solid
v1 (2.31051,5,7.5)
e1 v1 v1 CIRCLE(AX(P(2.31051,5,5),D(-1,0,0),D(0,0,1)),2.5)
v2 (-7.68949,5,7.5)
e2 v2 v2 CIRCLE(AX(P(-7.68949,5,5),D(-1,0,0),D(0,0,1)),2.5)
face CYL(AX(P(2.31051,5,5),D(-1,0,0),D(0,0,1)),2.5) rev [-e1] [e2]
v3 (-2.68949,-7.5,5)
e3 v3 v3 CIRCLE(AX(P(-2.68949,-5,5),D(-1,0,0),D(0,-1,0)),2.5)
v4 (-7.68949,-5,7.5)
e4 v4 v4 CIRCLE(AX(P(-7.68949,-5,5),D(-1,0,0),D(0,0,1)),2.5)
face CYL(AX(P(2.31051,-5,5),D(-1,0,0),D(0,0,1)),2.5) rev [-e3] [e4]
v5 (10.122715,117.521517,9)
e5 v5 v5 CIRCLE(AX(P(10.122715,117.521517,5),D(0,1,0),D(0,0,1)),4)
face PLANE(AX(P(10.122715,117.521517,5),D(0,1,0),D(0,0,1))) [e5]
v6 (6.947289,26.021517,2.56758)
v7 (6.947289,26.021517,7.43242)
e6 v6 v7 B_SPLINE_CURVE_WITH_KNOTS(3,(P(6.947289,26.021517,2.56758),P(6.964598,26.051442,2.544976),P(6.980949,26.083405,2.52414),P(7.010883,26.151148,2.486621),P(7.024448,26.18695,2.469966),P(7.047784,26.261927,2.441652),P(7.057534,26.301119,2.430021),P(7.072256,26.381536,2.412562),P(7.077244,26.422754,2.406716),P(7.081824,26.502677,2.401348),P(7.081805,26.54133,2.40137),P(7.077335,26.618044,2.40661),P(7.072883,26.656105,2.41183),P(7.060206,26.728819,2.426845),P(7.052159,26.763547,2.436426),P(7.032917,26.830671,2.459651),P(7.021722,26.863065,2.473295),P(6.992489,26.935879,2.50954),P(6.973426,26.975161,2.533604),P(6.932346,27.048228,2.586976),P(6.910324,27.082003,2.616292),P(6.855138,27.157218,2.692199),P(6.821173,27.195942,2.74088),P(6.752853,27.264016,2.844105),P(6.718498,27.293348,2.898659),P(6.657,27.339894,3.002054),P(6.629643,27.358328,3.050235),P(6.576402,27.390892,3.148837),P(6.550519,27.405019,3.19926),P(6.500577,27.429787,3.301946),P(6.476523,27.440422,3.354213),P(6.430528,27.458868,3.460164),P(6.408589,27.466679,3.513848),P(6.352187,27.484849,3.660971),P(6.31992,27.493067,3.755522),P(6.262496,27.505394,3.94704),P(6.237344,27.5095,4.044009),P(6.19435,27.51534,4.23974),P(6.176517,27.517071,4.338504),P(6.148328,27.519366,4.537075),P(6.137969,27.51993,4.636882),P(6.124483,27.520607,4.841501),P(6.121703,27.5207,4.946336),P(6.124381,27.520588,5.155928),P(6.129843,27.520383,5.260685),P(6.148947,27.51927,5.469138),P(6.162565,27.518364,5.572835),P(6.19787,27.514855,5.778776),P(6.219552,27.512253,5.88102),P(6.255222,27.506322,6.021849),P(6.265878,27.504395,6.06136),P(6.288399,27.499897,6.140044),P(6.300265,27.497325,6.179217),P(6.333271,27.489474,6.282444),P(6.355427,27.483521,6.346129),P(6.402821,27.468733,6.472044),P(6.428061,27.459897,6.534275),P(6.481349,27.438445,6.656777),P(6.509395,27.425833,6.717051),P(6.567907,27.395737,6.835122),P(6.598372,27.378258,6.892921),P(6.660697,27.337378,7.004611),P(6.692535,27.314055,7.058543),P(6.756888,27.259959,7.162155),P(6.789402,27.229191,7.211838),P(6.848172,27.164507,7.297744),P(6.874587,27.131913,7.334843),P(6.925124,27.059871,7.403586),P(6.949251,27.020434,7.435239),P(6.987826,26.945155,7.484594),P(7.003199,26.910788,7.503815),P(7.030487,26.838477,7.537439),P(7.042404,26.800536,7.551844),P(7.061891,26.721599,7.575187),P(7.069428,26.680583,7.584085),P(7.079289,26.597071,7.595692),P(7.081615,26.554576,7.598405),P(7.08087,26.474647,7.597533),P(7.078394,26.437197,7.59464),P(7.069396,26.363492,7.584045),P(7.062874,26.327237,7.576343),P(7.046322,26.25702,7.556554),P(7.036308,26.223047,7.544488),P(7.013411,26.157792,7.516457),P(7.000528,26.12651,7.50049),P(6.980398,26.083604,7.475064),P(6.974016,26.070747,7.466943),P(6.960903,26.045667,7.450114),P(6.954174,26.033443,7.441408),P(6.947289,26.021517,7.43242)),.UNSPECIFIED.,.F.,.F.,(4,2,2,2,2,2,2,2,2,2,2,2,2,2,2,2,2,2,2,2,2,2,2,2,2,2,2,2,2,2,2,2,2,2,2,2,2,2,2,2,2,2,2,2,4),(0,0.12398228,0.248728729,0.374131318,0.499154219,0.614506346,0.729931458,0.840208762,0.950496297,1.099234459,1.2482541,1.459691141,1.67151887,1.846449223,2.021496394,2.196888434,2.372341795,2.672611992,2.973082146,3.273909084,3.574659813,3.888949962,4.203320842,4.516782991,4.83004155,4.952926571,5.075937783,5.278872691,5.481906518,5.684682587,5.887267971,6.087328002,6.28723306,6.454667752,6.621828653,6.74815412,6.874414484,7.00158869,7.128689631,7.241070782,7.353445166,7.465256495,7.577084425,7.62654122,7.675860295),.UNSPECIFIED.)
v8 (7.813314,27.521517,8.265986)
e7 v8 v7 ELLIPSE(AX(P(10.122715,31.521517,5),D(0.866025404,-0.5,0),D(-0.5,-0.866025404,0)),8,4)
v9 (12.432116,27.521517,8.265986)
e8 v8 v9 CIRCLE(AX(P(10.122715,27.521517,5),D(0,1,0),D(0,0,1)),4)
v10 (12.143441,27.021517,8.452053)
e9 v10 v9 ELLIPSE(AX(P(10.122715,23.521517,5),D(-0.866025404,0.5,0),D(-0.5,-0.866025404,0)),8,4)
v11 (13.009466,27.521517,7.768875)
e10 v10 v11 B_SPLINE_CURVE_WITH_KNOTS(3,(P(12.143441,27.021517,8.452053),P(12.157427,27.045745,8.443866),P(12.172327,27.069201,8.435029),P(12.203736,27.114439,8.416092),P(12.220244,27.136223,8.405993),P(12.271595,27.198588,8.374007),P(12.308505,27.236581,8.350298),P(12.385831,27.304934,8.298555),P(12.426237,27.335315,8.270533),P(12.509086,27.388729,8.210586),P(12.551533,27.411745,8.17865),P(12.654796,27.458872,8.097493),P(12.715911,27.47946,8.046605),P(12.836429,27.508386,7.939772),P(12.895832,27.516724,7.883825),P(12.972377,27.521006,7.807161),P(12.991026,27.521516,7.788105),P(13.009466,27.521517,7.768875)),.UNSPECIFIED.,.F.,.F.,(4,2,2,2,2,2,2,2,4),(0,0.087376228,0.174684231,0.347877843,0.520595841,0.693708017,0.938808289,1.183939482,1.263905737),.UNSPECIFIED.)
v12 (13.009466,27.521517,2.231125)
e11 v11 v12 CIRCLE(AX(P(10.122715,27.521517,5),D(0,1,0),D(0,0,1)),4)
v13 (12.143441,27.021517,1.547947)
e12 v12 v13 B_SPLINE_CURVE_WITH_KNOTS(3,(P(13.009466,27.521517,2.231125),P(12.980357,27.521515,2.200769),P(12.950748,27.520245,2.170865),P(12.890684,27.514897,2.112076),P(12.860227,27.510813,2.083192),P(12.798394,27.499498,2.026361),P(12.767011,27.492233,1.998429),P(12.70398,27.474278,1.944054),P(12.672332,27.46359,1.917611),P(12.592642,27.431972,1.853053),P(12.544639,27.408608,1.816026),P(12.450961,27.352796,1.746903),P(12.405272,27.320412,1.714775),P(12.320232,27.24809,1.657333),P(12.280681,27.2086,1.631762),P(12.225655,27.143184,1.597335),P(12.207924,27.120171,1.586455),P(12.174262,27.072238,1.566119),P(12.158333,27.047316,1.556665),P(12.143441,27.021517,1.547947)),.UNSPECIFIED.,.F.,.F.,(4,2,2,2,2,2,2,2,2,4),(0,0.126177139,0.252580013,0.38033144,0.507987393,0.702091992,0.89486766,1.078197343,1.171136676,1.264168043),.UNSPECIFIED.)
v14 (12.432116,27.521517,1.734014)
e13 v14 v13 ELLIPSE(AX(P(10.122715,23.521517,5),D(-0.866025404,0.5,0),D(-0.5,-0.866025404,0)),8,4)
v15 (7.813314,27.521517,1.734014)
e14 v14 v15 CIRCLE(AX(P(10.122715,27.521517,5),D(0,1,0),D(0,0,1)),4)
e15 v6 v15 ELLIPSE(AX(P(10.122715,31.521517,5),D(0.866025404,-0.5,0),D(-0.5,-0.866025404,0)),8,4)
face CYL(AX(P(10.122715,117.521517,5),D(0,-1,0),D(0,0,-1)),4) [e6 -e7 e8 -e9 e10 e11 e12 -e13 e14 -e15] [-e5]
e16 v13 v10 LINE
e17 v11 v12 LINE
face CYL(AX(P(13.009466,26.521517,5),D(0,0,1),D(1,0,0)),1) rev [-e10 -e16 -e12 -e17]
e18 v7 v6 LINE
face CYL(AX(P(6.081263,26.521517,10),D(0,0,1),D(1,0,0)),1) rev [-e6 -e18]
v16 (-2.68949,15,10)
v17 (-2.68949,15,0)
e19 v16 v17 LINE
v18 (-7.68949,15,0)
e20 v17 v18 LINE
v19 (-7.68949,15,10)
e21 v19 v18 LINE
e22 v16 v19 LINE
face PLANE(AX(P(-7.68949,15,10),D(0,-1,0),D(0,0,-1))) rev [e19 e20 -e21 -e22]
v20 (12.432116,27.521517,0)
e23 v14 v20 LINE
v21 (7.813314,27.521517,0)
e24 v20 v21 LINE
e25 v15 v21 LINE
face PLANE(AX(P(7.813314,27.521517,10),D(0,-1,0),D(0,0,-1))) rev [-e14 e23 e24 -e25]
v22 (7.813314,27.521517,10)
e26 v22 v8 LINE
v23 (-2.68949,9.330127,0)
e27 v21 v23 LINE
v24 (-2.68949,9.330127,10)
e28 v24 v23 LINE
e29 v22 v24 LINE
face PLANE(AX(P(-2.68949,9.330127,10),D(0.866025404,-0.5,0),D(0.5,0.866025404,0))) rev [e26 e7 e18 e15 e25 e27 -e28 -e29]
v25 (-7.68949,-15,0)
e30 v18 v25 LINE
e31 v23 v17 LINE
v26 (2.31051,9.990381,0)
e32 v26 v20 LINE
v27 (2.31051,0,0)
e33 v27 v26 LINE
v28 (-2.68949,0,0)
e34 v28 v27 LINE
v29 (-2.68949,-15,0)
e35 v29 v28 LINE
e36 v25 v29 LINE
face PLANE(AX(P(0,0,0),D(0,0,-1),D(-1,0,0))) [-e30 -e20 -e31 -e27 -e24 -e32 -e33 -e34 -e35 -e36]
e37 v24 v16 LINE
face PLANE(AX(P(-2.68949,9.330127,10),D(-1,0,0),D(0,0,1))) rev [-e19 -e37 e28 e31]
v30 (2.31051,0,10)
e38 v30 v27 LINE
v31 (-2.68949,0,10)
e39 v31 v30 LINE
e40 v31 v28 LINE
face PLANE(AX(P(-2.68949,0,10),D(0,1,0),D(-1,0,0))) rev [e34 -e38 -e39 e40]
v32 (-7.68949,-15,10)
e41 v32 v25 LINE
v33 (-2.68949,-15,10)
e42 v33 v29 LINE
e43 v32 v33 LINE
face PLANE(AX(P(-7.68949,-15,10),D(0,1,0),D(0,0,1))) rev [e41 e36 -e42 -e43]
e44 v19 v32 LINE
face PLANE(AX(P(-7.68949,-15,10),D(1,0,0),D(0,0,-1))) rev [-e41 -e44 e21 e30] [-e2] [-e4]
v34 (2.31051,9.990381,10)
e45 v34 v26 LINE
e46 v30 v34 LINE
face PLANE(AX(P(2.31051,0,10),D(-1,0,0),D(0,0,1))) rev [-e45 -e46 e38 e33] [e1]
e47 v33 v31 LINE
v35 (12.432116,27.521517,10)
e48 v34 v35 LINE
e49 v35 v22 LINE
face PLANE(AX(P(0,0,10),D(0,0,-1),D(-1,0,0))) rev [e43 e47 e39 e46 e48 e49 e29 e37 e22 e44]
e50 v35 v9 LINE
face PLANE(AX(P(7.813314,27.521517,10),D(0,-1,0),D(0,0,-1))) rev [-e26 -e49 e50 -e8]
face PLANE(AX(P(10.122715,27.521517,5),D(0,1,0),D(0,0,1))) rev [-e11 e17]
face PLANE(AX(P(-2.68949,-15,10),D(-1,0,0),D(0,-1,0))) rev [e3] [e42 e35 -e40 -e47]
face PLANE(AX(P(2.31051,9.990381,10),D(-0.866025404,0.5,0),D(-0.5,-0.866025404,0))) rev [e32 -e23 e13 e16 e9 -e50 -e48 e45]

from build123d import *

# Parameters (mm, degrees)
BASE_DEPTH      = 10
ESQUISSE3_R     = 2.5
VIDE_TROU_DEPTH = 10
ESQUISSE4_R     = 4
AXE_DEPTH       = 90
CONG_5_R        = 1


with BuildPart() as part:
    # Esquisse2 → BASE (new body)
    with BuildSketch(Plane.XY):
        Polygon((-7.689490084, -15), (-2.689490084, -15), (-2.689490084, 0), (2.310509916, 0), (2.310509916, 9.990381057), (12.432116189, 27.521517376), (7.813314036, 27.521517376), (-2.689490084, 9.330127019), (-2.689490084, 15), (-7.689490084, 15), align=None)
    extrude(amount=BASE_DEPTH)

    # Esquisse3 → VIDE TROU (cut)
    with BuildSketch(Plane.ZY.offset(7.689490084)):
        with Locations((5, 5)):
            Circle(ESQUISSE3_R)
        with Locations((5, -5)):
            Circle(ESQUISSE3_R)
    extrude(amount=-VIDE_TROU_DEPTH, mode=Mode.SUBTRACT)

    # Esquisse4 → AXE (add)
    with BuildSketch(Plane(origin=(0, 27.521517376, 0), x_dir=(1, 0, 0), z_dir=(0, 1, 0))):
        with Locations(Location((10.122715113, -5, 0), (0, 0, 54.735610317))):
            Circle(ESQUISSE4_R)
    extrude(amount=AXE_DEPTH)

    # Congé5
    # the kernel refuses this fillet: 1 mm, written as the material it adds along each edge
    with BuildSketch(Plane(origin=(7.813314036, 27.521517376, -2.596113343), x_dir=(-0.500000000000004, -0.8660254037844363, 0), z_dir=(0, 0, 1))) as cong_5_piece_1_section:
        with BuildLine():
            CenterArc((CONG_5_R * 1.73205080757, -CONG_5_R), CONG_5_R, 90, 120)
            Line((CONG_5_R * 0.866025403784, -CONG_5_R * 1.5), (0, 0))
            Line((0, 0), (CONG_5_R * 1.73205080757, 0))
        make_face()
    cong_5_piece_1 = extrude(amount=15.192226685, mode=Mode.PRIVATE)
    cong_5_piece_1 = cong_5_piece_1 & Plane(origin=(10.122715113, 27.147514767, 5), x_dir=(0.577350269193122, 0, -0.8164965809252538), z_dir=(0, -1, 0)) * Cylinder(4, 38, mode=Mode.PRIVATE)
    add(cong_5_piece_1)
    with BuildSketch(Plane(origin=(12.432116189, 27.521517376, 0.290638003), x_dir=(-0.500000000000006, -0.8660254037844353, 0), z_dir=(0, 0, 1))) as cong_5_piece_2_section:
        with BuildLine():
            CenterArc((CONG_5_R * 0.57735026919, CONG_5_R), CONG_5_R, 210, 60)
            Line((-CONG_5_R * 0.288675134595, CONG_5_R * 0.5), (0, 0))
            Line((0, 0), (CONG_5_R * 0.57735026919, 0))
        make_face()
    cong_5_piece_2 = extrude(amount=9.418723993, mode=Mode.PRIVATE)
    cong_5_piece_2 = cong_5_piece_2 & Plane(origin=(10.122715113, 27.414246349, 5), x_dir=(0.577350269193122, 0, -0.8164965809252538), z_dir=(0, -1, 0)) * Cylinder(4, 22, mode=Mode.PRIVATE)
    add(cong_5_piece_2)


solid = part.part
